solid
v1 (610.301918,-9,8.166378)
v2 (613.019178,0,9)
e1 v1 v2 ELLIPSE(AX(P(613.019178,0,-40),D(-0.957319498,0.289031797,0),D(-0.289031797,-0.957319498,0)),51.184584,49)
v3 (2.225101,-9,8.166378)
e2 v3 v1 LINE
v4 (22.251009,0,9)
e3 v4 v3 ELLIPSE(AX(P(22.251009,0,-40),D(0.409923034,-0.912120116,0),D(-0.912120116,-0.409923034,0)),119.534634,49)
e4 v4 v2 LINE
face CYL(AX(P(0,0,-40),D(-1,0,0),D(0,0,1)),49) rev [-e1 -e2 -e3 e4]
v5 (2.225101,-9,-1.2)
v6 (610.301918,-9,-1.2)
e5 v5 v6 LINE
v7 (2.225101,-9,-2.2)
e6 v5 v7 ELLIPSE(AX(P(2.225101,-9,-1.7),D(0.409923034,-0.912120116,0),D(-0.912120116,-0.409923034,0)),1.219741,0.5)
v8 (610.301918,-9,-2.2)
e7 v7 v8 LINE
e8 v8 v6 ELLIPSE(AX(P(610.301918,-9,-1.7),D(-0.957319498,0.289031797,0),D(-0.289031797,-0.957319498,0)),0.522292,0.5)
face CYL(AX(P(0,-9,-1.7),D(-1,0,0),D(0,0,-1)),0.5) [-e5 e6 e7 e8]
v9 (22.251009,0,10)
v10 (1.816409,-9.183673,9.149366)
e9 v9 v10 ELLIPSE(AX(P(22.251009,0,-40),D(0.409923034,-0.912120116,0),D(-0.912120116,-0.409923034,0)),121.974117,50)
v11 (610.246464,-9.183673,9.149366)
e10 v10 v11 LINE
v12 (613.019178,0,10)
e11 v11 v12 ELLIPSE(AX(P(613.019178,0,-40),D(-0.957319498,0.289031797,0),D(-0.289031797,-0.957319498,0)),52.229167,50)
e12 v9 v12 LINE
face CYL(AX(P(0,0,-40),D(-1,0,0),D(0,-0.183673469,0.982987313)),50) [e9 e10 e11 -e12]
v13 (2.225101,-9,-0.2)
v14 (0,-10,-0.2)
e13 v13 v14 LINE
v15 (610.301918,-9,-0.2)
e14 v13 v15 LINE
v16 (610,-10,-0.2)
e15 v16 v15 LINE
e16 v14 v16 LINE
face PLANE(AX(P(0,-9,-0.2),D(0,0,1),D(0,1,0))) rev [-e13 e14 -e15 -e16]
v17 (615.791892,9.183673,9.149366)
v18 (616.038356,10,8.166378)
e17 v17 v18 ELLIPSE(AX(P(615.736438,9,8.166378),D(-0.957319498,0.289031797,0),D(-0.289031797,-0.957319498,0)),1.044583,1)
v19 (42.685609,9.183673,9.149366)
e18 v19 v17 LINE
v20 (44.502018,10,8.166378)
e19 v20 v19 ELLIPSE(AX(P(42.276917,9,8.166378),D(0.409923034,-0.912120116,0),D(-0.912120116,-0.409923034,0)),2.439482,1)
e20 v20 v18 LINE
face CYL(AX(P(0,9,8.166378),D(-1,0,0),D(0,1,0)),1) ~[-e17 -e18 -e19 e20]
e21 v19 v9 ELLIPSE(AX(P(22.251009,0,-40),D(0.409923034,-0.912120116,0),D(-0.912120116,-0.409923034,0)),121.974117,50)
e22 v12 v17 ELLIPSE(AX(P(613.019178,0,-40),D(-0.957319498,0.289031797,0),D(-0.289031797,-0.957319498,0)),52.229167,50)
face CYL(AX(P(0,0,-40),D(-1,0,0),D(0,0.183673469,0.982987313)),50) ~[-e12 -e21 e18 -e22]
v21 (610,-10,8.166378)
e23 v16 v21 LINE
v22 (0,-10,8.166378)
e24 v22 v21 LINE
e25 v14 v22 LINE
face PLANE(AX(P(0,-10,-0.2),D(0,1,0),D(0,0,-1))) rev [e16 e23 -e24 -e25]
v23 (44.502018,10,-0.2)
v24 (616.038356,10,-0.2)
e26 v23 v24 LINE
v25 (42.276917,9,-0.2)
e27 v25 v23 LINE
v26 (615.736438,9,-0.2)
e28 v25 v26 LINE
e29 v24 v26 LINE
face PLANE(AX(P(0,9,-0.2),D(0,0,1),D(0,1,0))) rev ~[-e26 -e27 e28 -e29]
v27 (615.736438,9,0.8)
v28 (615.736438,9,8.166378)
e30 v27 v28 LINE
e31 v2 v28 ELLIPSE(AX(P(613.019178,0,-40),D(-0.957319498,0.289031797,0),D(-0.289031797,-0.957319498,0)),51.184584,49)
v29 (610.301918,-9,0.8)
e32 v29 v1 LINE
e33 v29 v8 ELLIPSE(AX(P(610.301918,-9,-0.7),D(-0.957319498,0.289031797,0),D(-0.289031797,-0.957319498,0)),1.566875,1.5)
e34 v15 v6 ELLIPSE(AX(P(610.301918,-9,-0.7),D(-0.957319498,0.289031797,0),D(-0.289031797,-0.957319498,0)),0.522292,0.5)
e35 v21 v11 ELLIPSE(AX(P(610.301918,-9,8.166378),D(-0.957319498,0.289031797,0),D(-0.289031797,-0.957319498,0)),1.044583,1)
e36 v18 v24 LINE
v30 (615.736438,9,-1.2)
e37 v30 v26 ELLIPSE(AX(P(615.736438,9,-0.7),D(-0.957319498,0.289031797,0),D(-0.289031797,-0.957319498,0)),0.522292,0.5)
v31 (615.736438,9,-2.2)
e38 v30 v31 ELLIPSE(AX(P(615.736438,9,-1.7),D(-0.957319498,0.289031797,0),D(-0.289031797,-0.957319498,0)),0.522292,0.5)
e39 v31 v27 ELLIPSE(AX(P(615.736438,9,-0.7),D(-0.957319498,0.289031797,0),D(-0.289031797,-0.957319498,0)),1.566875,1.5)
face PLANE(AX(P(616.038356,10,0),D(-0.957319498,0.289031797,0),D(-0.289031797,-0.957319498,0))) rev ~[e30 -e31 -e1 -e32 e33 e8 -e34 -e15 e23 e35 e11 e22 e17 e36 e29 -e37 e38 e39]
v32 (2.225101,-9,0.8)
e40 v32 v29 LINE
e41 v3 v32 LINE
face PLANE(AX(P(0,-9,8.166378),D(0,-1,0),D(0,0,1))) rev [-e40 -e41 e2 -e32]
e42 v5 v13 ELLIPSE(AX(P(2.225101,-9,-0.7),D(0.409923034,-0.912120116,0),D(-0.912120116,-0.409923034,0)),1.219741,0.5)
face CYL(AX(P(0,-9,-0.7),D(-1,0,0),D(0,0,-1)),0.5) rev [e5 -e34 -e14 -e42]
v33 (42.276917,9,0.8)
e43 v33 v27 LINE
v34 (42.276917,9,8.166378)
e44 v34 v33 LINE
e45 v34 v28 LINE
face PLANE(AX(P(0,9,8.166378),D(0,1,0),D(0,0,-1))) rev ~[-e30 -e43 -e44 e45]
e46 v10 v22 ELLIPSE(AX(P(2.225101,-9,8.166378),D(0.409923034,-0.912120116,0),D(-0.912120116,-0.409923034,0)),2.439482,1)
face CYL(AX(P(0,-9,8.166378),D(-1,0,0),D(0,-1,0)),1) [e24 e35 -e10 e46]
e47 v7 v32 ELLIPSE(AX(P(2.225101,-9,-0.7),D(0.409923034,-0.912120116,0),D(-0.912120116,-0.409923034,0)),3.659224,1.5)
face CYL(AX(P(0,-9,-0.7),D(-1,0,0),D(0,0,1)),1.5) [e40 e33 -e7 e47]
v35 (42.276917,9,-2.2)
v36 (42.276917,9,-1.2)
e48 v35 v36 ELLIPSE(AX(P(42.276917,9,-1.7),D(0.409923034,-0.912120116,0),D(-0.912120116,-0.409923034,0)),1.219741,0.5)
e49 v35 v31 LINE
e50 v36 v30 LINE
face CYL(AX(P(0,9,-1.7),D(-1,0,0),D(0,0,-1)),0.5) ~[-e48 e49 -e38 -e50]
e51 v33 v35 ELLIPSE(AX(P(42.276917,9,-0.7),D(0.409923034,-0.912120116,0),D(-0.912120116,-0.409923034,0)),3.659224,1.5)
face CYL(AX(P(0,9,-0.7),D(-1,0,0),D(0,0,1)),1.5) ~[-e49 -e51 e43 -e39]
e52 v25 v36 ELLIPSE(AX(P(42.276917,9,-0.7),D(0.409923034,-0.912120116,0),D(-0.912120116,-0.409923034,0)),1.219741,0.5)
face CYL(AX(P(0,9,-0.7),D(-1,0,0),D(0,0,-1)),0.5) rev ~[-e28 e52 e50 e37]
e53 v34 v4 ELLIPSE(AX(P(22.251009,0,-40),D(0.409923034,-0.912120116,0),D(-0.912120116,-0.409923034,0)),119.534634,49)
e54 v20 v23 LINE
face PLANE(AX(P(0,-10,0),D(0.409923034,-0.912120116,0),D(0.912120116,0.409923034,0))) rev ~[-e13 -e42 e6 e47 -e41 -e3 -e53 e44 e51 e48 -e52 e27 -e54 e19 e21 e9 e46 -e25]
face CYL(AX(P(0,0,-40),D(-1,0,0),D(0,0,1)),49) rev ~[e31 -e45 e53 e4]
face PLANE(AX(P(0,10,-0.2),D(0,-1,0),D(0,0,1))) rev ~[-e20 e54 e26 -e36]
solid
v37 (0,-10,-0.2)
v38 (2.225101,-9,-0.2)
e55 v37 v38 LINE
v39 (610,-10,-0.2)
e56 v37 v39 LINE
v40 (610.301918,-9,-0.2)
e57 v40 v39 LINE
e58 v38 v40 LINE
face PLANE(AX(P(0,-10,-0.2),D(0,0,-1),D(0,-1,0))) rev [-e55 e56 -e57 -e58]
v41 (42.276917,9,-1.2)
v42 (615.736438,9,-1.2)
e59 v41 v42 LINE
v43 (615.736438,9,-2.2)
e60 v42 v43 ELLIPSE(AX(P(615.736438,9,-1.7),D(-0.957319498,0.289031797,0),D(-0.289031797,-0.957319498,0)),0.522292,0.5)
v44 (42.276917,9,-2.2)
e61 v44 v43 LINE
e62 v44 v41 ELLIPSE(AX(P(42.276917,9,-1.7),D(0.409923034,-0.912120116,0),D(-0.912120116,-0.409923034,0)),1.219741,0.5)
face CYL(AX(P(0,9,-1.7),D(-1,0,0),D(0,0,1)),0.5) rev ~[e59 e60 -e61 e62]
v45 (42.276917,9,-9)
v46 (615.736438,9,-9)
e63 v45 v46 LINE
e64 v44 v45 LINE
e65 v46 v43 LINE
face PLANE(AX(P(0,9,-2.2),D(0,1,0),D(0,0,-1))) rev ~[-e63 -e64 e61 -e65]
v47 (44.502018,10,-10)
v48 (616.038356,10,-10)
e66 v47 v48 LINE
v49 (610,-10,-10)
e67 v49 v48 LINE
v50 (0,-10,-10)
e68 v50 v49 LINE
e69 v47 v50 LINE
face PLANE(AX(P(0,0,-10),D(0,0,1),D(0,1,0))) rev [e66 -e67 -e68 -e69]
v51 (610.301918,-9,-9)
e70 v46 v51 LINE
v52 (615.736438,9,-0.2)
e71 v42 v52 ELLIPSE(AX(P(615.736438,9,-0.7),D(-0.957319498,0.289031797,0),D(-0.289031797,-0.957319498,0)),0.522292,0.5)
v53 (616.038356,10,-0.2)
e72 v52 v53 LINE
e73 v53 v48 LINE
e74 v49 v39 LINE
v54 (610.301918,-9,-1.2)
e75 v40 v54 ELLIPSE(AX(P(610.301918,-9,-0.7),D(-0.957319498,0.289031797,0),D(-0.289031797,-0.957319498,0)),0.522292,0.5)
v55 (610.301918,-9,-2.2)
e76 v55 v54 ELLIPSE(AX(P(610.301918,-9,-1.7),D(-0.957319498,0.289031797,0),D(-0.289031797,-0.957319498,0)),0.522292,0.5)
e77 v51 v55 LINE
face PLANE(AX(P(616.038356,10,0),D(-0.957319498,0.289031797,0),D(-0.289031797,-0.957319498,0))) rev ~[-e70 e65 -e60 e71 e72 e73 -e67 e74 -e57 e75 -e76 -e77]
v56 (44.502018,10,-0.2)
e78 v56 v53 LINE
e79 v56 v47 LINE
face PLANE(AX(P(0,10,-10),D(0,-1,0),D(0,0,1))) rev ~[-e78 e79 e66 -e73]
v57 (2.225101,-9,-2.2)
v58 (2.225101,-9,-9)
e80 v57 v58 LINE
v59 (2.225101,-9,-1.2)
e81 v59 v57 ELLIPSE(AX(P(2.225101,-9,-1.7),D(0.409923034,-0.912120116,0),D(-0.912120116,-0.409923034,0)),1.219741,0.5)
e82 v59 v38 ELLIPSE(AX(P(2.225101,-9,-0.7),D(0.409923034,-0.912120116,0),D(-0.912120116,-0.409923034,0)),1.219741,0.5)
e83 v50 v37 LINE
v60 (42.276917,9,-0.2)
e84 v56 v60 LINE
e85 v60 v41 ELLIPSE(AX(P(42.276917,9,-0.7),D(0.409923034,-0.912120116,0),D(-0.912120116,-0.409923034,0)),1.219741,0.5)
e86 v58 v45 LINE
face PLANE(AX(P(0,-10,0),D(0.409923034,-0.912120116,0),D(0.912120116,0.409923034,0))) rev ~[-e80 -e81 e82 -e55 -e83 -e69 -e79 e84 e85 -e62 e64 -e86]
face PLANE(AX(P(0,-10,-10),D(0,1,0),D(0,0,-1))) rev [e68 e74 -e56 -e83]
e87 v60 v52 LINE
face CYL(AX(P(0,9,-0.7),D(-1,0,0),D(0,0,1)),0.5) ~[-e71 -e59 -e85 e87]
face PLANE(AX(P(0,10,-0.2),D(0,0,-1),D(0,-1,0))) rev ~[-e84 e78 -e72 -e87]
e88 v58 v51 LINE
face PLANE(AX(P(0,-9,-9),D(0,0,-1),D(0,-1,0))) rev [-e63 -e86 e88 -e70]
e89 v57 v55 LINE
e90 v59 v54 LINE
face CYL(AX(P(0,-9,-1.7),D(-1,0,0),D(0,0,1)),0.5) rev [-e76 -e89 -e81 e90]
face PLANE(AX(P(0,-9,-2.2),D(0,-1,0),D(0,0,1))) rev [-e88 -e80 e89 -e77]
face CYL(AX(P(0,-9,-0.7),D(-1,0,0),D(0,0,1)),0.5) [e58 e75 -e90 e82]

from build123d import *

# Parameters (mm, degrees)
F2_DEPTH      = 1200
F4_DEPTH      = 1200
F8_DEPTH      = 10.001
F8_DEPTH_BACK = 10.001


with BuildPart() as f2:
    # F1 (on Right) → F2 (new body)
    with BuildSketch(Plane.YZ):
        with BuildLine():
            Line((0, -9), (0, -10))
            Line((0, -10), (10, -10))
            Line((10, -10), (10, -0.2))
            Line((10, -0.2), (9, -0.2))
            ThreePointArc((9, -0.2), (8.5, -0.7), (9, -1.2))
            ThreePointArc((9, -1.2), (9.5, -1.7), (9, -2.2))
            Line((9, -2.2), (9, -9))
            Line((9, -9), (0, -9))
        make_face()
    extrude(amount=F2_DEPTH)

    # F5: F2 across plane


with BuildPart() as f4:
    # F3 (on Right) → F4 (new body)
    with BuildSketch(Plane.YZ):
        with BuildLine():
            Line((9, -0.2), (10, -0.2))
            Line((10, -0.2), (10, 8.1663783152))
            ThreePointArc((10, 8.1663783152), (9.7693092582, 8.8052548802), (9.1836734694, 9.1493656277))
            ThreePointArc((9.1836734694, 9.1493656277), (4.6114920912, 9.7868872364), (0, 10))
            Line((0, 10), (0, 9))
            ThreePointArc((0, 9), (4.5192622493, 8.7911494917), (9, 8.1663783152))
            Line((9, 8.1663783152), (9, 0.8))
            ThreePointArc((9, 0.8), (7.5, -0.7), (9, -2.2))
            ThreePointArc((9, -2.2), (9.5, -1.7), (9, -1.2))
            ThreePointArc((9, -1.2), (8.5, -0.7), (9, -0.2))
        make_face()
    extrude(amount=F4_DEPTH)

    # F6: F4 across plane


with BuildPart() as f2_1:
    add(f2.part)
    add(f2.part.mirror(Plane.XZ))


with BuildPart() as f4_1:
    add(f4.part)
    add(f4.part.mirror(Plane.XZ))


with BuildPart() as f8_tool:
    # F7 (on Top) → F8 (new body, two sides)
    with BuildSketch(Plane.XY) as f8_sk:
        Polygon((0, 10), (0, 0), (0, -10), (44.5020182264, 10), align=None)
        Polygon((616.0383560074, 10), (610, -10), (1208.0904245377, -10), (1208.0904245377, 10), align=None)
    extrude(amount=F8_DEPTH)
    extrude(f8_sk.sketch, amount=-F8_DEPTH_BACK)


with BuildPart() as f2_2:
    add(f2_1.part)

    # F8: cut by f8_tool
    add(f8_tool.part, mode=Mode.SUBTRACT)


with BuildPart() as f4_2:
    add(f4_1.part)

    # F8: cut by f8_tool
    add(f8_tool.part, mode=Mode.SUBTRACT)


solid = Compound([f2_2.part, f4_2.part])
